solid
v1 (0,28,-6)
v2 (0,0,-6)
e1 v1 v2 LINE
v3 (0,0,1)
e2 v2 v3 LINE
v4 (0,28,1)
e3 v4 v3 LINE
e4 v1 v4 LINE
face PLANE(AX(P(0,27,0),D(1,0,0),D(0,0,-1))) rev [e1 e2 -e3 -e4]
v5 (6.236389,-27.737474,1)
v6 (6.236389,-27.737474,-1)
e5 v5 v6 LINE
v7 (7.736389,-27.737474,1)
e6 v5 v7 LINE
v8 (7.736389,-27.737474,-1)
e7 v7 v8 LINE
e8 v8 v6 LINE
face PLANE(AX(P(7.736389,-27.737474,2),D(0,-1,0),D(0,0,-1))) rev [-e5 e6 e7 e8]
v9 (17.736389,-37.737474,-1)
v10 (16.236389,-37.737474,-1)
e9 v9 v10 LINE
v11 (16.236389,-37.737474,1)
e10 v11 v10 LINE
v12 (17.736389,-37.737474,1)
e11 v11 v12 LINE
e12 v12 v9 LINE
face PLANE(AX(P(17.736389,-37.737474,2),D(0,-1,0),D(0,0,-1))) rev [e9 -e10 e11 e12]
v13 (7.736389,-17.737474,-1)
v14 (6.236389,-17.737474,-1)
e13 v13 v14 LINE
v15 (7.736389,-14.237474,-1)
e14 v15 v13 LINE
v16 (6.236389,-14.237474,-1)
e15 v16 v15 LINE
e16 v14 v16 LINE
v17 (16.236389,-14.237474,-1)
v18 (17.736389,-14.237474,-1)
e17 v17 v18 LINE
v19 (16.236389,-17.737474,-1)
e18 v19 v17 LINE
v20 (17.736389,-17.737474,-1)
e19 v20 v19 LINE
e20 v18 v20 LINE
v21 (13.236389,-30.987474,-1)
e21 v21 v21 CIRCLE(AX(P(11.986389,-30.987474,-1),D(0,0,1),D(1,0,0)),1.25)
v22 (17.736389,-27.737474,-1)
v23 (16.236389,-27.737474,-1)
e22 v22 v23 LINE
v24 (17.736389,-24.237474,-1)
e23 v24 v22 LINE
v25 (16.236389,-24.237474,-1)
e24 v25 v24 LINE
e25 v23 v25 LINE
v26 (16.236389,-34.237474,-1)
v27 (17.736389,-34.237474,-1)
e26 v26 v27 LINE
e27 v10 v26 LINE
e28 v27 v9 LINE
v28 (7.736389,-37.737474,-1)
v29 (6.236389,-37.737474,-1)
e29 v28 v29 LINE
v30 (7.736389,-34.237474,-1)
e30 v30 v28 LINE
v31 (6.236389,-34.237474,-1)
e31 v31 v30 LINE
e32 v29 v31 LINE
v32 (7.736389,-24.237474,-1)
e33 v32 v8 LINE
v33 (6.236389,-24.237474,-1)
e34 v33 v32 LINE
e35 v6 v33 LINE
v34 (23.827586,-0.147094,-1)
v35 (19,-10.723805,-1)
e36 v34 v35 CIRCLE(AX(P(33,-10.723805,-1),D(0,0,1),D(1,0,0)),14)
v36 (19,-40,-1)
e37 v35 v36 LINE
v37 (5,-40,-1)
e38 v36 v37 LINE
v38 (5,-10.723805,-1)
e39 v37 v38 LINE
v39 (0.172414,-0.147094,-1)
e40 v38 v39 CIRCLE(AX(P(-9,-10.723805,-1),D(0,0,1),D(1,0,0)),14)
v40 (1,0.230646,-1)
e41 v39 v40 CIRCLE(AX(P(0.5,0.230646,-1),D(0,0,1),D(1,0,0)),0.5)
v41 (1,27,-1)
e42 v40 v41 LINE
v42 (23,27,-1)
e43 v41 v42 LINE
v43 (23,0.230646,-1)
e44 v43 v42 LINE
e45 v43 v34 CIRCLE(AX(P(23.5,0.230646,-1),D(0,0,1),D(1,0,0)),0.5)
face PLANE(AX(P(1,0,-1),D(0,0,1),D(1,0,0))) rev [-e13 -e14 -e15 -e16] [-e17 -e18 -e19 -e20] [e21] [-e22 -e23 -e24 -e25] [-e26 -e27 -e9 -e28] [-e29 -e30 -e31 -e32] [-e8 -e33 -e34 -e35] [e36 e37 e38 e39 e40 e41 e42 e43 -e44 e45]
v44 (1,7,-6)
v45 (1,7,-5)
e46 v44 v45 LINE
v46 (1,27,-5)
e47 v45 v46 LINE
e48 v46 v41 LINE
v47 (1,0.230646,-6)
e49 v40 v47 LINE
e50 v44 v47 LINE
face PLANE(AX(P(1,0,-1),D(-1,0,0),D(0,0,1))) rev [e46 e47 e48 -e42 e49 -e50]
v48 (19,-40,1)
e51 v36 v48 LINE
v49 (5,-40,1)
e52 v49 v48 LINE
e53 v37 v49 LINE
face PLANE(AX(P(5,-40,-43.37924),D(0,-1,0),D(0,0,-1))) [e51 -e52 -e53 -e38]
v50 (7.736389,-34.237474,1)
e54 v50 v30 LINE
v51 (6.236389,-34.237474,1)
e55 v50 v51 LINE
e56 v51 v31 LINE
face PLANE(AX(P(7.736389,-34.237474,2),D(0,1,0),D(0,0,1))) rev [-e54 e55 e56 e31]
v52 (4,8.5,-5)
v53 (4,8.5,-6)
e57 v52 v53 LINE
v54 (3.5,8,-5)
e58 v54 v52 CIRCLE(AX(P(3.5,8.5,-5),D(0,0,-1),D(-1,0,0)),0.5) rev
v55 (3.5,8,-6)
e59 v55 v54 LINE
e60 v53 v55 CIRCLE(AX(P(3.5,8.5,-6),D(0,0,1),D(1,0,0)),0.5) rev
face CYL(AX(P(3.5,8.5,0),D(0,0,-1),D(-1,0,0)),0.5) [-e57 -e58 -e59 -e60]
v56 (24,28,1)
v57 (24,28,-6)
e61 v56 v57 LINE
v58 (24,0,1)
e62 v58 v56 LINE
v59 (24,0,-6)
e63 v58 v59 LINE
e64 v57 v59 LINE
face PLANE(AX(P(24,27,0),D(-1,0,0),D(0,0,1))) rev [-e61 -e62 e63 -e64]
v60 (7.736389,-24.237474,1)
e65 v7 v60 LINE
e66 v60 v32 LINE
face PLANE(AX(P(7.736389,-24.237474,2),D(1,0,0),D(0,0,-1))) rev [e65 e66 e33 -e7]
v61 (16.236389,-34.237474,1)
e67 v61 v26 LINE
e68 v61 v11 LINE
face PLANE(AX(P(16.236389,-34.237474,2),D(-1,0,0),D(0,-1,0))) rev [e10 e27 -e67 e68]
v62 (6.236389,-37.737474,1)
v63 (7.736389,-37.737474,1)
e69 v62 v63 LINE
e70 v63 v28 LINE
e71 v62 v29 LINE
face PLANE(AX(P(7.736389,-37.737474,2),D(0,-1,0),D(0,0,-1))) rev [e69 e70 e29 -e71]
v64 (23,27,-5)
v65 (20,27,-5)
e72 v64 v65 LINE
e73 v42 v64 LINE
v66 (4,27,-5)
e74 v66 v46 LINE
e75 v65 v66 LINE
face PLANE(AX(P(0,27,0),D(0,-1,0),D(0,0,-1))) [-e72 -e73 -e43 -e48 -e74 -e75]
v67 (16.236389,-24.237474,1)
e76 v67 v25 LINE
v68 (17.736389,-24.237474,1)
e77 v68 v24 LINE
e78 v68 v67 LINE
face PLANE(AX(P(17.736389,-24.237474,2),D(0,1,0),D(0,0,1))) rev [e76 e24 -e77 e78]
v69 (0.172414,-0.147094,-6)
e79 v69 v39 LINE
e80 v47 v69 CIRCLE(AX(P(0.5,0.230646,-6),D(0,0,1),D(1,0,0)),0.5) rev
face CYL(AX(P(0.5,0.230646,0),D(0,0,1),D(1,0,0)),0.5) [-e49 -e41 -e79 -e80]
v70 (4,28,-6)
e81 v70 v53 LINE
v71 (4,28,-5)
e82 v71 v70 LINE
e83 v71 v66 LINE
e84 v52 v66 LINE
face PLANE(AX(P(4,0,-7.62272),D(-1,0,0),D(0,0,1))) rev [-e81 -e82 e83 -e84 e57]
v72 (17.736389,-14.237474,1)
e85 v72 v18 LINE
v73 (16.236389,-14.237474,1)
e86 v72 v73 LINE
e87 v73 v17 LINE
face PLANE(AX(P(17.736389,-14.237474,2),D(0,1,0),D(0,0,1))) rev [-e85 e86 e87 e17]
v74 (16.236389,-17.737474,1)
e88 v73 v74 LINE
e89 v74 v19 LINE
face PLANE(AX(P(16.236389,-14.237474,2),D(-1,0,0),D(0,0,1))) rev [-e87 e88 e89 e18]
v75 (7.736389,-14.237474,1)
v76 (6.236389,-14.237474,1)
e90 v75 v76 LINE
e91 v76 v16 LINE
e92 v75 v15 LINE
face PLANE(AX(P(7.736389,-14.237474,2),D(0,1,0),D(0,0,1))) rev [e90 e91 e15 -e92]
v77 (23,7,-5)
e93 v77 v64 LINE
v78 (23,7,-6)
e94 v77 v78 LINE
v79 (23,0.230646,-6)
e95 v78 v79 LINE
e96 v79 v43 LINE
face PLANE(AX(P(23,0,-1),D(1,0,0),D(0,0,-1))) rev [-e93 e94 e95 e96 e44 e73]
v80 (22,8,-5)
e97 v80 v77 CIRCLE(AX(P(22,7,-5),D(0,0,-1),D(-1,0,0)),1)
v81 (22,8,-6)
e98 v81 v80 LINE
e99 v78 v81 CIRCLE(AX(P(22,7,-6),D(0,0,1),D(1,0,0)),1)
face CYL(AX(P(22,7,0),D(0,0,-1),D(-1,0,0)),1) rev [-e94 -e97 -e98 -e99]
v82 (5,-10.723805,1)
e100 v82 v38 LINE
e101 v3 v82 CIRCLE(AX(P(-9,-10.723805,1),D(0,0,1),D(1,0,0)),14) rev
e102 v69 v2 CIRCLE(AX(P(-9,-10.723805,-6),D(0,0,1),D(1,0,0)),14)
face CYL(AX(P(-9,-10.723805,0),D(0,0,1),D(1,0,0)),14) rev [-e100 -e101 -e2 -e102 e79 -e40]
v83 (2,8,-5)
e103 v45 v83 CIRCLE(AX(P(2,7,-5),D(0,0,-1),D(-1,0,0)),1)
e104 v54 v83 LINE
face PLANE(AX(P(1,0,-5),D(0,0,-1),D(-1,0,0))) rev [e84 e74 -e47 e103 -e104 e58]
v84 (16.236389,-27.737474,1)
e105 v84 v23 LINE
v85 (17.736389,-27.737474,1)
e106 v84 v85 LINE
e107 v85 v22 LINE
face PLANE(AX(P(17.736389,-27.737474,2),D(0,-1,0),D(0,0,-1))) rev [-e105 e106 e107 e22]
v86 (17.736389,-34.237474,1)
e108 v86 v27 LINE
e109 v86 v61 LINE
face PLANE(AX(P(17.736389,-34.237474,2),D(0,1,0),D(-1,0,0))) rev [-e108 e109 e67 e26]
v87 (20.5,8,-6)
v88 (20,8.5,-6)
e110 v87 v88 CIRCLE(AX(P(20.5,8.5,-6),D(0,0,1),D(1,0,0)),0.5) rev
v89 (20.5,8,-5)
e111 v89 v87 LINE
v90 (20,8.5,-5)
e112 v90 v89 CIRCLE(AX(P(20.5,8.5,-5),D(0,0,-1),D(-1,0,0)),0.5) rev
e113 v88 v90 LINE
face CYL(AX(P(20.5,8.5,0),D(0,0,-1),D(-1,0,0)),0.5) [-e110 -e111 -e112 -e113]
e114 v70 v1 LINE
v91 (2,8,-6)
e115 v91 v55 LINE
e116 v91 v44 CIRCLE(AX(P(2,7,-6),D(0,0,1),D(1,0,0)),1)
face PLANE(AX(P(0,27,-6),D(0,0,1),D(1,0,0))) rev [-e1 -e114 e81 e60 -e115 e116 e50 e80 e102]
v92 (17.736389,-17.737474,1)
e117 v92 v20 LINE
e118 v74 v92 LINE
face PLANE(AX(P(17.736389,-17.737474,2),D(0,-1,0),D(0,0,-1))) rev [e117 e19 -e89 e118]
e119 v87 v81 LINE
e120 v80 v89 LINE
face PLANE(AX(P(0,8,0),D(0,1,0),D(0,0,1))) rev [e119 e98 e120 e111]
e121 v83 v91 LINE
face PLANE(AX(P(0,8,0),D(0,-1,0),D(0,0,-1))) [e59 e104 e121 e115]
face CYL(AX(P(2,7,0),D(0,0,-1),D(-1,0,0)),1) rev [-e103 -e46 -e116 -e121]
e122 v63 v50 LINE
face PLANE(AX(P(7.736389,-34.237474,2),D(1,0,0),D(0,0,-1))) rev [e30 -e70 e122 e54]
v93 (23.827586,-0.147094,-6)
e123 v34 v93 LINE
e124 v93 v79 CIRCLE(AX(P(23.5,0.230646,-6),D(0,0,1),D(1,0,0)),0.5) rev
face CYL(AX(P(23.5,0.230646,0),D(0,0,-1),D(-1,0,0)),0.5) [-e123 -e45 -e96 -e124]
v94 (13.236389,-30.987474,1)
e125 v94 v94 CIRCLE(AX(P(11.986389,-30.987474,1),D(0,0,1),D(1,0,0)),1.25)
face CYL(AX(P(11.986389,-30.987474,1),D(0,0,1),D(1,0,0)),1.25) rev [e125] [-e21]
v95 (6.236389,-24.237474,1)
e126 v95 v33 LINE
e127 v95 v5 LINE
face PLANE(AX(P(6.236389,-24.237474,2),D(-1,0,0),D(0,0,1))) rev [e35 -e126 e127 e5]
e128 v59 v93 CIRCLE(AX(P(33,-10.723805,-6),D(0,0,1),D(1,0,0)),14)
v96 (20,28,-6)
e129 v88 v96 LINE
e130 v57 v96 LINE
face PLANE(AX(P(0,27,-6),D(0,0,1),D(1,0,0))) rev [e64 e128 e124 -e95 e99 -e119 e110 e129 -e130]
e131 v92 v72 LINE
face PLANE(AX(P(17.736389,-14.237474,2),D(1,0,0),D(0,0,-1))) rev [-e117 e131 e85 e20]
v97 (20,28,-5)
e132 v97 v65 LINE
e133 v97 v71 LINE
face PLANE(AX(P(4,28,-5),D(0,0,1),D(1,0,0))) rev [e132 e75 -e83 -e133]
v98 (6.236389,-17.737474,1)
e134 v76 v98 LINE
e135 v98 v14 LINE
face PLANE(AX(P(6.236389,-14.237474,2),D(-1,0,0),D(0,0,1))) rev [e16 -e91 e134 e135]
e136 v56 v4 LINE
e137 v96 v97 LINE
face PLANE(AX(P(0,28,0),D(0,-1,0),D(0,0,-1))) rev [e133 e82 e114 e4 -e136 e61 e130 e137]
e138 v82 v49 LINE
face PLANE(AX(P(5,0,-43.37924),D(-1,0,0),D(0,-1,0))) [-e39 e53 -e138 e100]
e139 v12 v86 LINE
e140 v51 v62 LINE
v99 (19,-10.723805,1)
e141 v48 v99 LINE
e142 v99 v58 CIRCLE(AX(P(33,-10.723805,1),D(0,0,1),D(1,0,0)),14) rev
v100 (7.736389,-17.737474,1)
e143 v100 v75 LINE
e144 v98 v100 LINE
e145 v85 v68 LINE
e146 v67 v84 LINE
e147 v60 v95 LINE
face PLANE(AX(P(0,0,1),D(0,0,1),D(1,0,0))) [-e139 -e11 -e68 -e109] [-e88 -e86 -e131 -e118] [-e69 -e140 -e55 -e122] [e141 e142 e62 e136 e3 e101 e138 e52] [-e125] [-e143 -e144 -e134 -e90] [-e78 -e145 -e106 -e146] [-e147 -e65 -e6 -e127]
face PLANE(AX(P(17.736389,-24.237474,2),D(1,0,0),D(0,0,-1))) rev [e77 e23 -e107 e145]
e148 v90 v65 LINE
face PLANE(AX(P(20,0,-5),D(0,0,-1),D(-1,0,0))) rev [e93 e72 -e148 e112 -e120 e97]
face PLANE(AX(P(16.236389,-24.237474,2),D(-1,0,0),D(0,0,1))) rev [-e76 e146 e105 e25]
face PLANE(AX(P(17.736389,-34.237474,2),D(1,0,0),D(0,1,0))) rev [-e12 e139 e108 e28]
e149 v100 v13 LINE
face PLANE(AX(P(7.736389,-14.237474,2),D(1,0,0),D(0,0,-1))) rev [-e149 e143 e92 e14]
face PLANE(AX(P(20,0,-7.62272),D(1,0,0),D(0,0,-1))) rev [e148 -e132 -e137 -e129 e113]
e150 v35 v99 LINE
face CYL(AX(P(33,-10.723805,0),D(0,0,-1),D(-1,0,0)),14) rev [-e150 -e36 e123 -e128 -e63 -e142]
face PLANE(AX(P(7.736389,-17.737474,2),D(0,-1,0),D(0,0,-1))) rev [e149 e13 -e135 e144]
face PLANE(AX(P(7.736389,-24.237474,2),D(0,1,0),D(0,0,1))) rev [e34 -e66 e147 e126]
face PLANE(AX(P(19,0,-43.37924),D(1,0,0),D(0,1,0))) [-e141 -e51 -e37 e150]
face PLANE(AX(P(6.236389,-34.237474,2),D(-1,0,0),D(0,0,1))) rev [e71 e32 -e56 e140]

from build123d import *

# Parameters (mm, degrees)
SKETCH1_W                   = 24
SKETCH1_H                   = 6
BOSS_EXTRUDE1_DEPTH         = 27
CUT_EXTRUDE1_DEPTH          = 27
BOSS_EXTRUDE2_DEPTH         = 1
SKETCH4_W                   = 3
SKETCH4_H                   = 1
CUT_EXTRUDE2_DEPTH          = 8
FILLET1_R                   = 1
SKETCH5_W                   = 14
SKETCH5_H                   = 40
BOSS_EXTRUDE3_DEPTH         = 1
BOSS_EXTRUDE4_DEPTH         = 1
FILLET2_R                   = 14
SKETCH6_W                   = 1.5
SKETCH6_H                   = 3.5
CUT_EXTRUDE3_DEPTH          = 3
TAP_DRILL_FOR_M3X0_5_TAP1_D = 2.5
FILLET3_R                   = 0.5


with BuildPart() as part:
    # Sketch1 → Boss-Extrude1 (new body)
    with BuildSketch(Plane(origin=(0, 0, 0), x_dir=(1, 0, 0), z_dir=(0, 1, 0))):
        with Locations((12, 3)):
            Rectangle(SKETCH1_W, SKETCH1_H)
    extrude(amount=BOSS_EXTRUDE1_DEPTH)

    # Sketch2 → Cut-Extrude1 (cut)
    with BuildSketch(Plane(origin=(0, 27, 0), x_dir=(1, 0, 0), z_dir=(0, 1, 0))):
        Polygon((1, 1), (23, 1), (23, 5), (20, 5), (20, 7.622720443), (4, 7.622720443), (4, 5), (1, 5), align=None)
    extrude(amount=-CUT_EXTRUDE1_DEPTH, mode=Mode.SUBTRACT)

    # Sketch3 → Boss-Extrude2 (add)
    with BuildSketch(Plane(origin=(0, 27, 0), x_dir=(1, 0, 0), z_dir=(0, 1, 0))):
        Polygon((24, 0), (24, 5), (24, 6), (20, 6), (20, 5), (4, 5), (4, 6), (0, 6), (0, 5), (0, 0), align=None)
    extrude(amount=BOSS_EXTRUDE2_DEPTH)

    # Sketch4 → Cut-Extrude2 (cut)
    with BuildSketch(Plane.XZ):
        with Locations((2.5, -5.5)):
            Rectangle(SKETCH4_W, SKETCH4_H)
        with Locations((21.5, -5.5)):
            Rectangle(SKETCH4_W, SKETCH4_H)
    extrude(amount=-CUT_EXTRUDE2_DEPTH, mode=Mode.SUBTRACT)

    # Fillet1
    fillet1_edges = [part.edges().sort_by_distance(p)[0] for p in [
        (1, 8, -5.5),
        (23, 8, -5.5),
    ]]
    fillet(fillet1_edges, radius=FILLET1_R)

    # Sketch5 → Boss-Extrude3 (add)
    with BuildSketch(Plane.XY):
        with Locations((12, -20)):
            Rectangle(SKETCH5_W, SKETCH5_H)
    extrude(amount=-BOSS_EXTRUDE3_DEPTH)

    # Sketch7 → Boss-Extrude4 (add)
    with BuildSketch(Plane.XY):
        Polygon((0, 28), (0, 0), (5, 0), (5, -40), (19, -40), (19, 0), (24, 0), (24, 28), align=None)
    extrude(amount=BOSS_EXTRUDE4_DEPTH)

    # Fillet2
    # the kernel refuses this fillet: 14 mm, written as the material it adds along each edge
    with BuildSketch(Plane(origin=(19, 0, -27.809513237), x_dir=(0, -1, 0), z_dir=(0, 0, 1))) as fillet2_piece_1_section:
        with BuildLine():
            CenterArc((10.723805295, 14), FILLET2_R, 220.005200885, 49.994799115)
            Line((0, 5), (-0.214476106, 4.82))
            ThreePointArc((-0.214476106, 4.82), (-0.28, 2.5), (-0.28, 0))
            Line((-0.28, 0), (0, -0.28))
            Line((0, -0.28), (10.723805295, -0.28))
            Line((10.723805295, -0.28), (10.723805295, 0))
        make_face()
    fillet2_piece_1 = extrude(amount=28.809513237, mode=Mode.PRIVATE)
    fillet2_piece_1 = split(fillet2_piece_1, bisect_by=Plane(origin=(23.365169803, -0.171945875, -1), z_dir=(0, 0, -1)), keep=Keep.TOP, mode=Mode.PRIVATE)
    fillet2_piece_1 = split(fillet2_piece_1, bisect_by=Plane(origin=(23.365169803, -0.171945875, -6), z_dir=(0, 0, 1)), keep=Keep.TOP, mode=Mode.PRIVATE)
    fillet2_piece_1 = split(fillet2_piece_1, bisect_by=Plane(origin=(23, -0.171945875, -3.5), z_dir=(1, 0, 0)), keep=Keep.TOP, mode=Mode.PRIVATE)
    add(fillet2_piece_1)
    with BuildSketch(Plane(origin=(19, 0, -1), x_dir=(0, -1, 0), z_dir=(0, 0, 1))) as fillet2_piece_2_section:
        with BuildLine():
            CenterArc((10.723805295, 14), FILLET2_R, 220.005200885, 49.994799115)
            Line((0, 5), (-0.214476106, 4.82))
            ThreePointArc((-0.214476106, 4.82), (-0.28, 2.5), (-0.28, 0))
            Line((-0.28, 0), (0, -0.28))
            Line((0, -0.28), (10.723805295, -0.28))
            Line((10.723805295, -0.28), (10.723805295, 0))
        make_face()
    fillet2_piece_2 = extrude(amount=2, mode=Mode.PRIVATE)
    fillet2_piece_2 = split(fillet2_piece_2, bisect_by=Plane(origin=(23, -2.887653154, 0), z_dir=(-1, 0, 0)), keep=Keep.TOP, mode=Mode.PRIVATE)
    add(fillet2_piece_2)
    with BuildSketch(Plane(origin=(19, 0, -1), x_dir=(0, -1, 0), z_dir=(0, 0, 1))) as fillet2_piece_3_section:
        with BuildLine():
            CenterArc((10.723805295, 14), FILLET2_R, 220.005200885, 49.994799115)
            Line((0, 5), (-0.214476106, 4.82))
            ThreePointArc((-0.214476106, 4.82), (-0.28, 2.5), (-0.28, 0))
            Line((-0.28, 0), (0, -0.28))
            Line((0, -0.28), (10.723805295, -0.28))
            Line((10.723805295, -0.28), (10.723805295, 0))
        make_face()
    fillet2_piece_3 = extrude(amount=2, mode=Mode.PRIVATE)
    fillet2_piece_3 = split(fillet2_piece_3, bisect_by=Plane(origin=(23, -0.171945875, 0), z_dir=(1, 0, 0)), keep=Keep.TOP, mode=Mode.PRIVATE)
    add(fillet2_piece_3)
    with BuildSketch(Plane(origin=(5, 0, -27.809513237), x_dir=(-1, 0, 0), z_dir=(0, 0, 1))) as fillet2_piece_4_section:
        with BuildLine():
            CenterArc((14, 10.723805295), FILLET2_R, 180, 49.994799115)
            Line((0, 10.723805295), (-0.28, 10.723805295))
            Line((-0.28, 10.723805295), (-0.28, 0))
            Line((-0.28, 0), (0, -0.28))
            ThreePointArc((0, -0.28), (2.5, -0.28), (4.82, -0.214476106))
            Line((4.82, -0.214476106), (5, 0))
        make_face()
    fillet2_piece_4 = extrude(amount=28.809513237, mode=Mode.PRIVATE)
    fillet2_piece_4 = split(fillet2_piece_4, bisect_by=Plane(origin=(1, -0.171945875, -3.5), z_dir=(-1, 0, 0)), keep=Keep.TOP, mode=Mode.PRIVATE)
    fillet2_piece_4 = split(fillet2_piece_4, bisect_by=Plane(origin=(0.634830197, -0.171945875, -6), z_dir=(0, 0, 1)), keep=Keep.TOP, mode=Mode.PRIVATE)
    fillet2_piece_4 = split(fillet2_piece_4, bisect_by=Plane(origin=(0.634830197, -0.171945875, -1), z_dir=(0, 0, -1)), keep=Keep.TOP, mode=Mode.PRIVATE)
    add(fillet2_piece_4)
    with BuildSketch(Plane(origin=(5, 0, -1), x_dir=(-1, 0, 0), z_dir=(0, 0, 1))) as fillet2_piece_5_section:
        with BuildLine():
            CenterArc((14, 10.723805295), FILLET2_R, 180, 49.994799115)
            Line((0, 10.723805295), (-0.28, 10.723805295))
            Line((-0.28, 10.723805295), (-0.28, 0))
            Line((-0.28, 0), (0, -0.28))
            ThreePointArc((0, -0.28), (2.5, -0.28), (4.82, -0.214476106))
            Line((4.82, -0.214476106), (5, 0))
        make_face()
    fillet2_piece_5 = extrude(amount=2, mode=Mode.PRIVATE)
    fillet2_piece_5 = split(fillet2_piece_5, bisect_by=Plane(origin=(1, -0.171945875, 0), z_dir=(-1, 0, 0)), keep=Keep.TOP, mode=Mode.PRIVATE)
    add(fillet2_piece_5)
    with BuildSketch(Plane(origin=(5, 0, -1), x_dir=(-1, 0, 0), z_dir=(0, 0, 1))) as fillet2_piece_6_section:
        with BuildLine():
            CenterArc((14, 10.723805295), FILLET2_R, 180, 49.994799115)
            Line((0, 10.723805295), (-0.28, 10.723805295))
            Line((-0.28, 10.723805295), (-0.28, 0))
            Line((-0.28, 0), (0, -0.28))
            ThreePointArc((0, -0.28), (2.5, -0.28), (4.82, -0.214476106))
            Line((4.82, -0.214476106), (5, 0))
        make_face()
    fillet2_piece_6 = extrude(amount=2, mode=Mode.PRIVATE)
    fillet2_piece_6 = split(fillet2_piece_6, bisect_by=Plane(origin=(1, -2.887653154, 0), z_dir=(1, 0, 0)), keep=Keep.TOP, mode=Mode.PRIVATE)
    add(fillet2_piece_6)

    # Sketch6 → Cut-Extrude3 (cut)
    with BuildSketch(Plane(origin=(0, 0, -1), x_dir=(-1, 0, 0), z_dir=(0, 0, -1))):
        with Locations((-6.986389138, -35.987474117)):
            Rectangle(SKETCH6_W, SKETCH6_H)
        with Locations((-16.986389138, -35.987474117)):
            Rectangle(SKETCH6_W, SKETCH6_H)
        with Locations((-6.986389138, -25.987474117)):
            Rectangle(SKETCH6_W, SKETCH6_H)
        with Locations((-16.986389138, -25.987474117)):
            Rectangle(SKETCH6_W, SKETCH6_H)
        with Locations((-16.986389138, -15.987474117)):
            Rectangle(SKETCH6_W, SKETCH6_H)
        with Locations((-6.986389138, -15.987474117)):
            Rectangle(SKETCH6_W, SKETCH6_H)
    extrude(amount=-CUT_EXTRUDE3_DEPTH, mode=Mode.SUBTRACT)

    # Tap Drill for M3x0.5 Tap1 (through all)
    with Locations(Plane.XY.offset(1)):
        with Locations((11.986389138, -30.987474117)):
            Hole(TAP_DRILL_FOR_M3X0_5_TAP1_D / 2)

    # Fillet3
    fillet3_edges = [part.edges().sort_by_distance(p)[0] for p in [
        (23, -0.925846324, -3.5),
        (1, -0.925846324, -3.5),
        (4, 8, -5.5),
        (20, 8, -5.5),
    ]]
    fillet(fillet3_edges, radius=FILLET3_R)


solid = part.part
